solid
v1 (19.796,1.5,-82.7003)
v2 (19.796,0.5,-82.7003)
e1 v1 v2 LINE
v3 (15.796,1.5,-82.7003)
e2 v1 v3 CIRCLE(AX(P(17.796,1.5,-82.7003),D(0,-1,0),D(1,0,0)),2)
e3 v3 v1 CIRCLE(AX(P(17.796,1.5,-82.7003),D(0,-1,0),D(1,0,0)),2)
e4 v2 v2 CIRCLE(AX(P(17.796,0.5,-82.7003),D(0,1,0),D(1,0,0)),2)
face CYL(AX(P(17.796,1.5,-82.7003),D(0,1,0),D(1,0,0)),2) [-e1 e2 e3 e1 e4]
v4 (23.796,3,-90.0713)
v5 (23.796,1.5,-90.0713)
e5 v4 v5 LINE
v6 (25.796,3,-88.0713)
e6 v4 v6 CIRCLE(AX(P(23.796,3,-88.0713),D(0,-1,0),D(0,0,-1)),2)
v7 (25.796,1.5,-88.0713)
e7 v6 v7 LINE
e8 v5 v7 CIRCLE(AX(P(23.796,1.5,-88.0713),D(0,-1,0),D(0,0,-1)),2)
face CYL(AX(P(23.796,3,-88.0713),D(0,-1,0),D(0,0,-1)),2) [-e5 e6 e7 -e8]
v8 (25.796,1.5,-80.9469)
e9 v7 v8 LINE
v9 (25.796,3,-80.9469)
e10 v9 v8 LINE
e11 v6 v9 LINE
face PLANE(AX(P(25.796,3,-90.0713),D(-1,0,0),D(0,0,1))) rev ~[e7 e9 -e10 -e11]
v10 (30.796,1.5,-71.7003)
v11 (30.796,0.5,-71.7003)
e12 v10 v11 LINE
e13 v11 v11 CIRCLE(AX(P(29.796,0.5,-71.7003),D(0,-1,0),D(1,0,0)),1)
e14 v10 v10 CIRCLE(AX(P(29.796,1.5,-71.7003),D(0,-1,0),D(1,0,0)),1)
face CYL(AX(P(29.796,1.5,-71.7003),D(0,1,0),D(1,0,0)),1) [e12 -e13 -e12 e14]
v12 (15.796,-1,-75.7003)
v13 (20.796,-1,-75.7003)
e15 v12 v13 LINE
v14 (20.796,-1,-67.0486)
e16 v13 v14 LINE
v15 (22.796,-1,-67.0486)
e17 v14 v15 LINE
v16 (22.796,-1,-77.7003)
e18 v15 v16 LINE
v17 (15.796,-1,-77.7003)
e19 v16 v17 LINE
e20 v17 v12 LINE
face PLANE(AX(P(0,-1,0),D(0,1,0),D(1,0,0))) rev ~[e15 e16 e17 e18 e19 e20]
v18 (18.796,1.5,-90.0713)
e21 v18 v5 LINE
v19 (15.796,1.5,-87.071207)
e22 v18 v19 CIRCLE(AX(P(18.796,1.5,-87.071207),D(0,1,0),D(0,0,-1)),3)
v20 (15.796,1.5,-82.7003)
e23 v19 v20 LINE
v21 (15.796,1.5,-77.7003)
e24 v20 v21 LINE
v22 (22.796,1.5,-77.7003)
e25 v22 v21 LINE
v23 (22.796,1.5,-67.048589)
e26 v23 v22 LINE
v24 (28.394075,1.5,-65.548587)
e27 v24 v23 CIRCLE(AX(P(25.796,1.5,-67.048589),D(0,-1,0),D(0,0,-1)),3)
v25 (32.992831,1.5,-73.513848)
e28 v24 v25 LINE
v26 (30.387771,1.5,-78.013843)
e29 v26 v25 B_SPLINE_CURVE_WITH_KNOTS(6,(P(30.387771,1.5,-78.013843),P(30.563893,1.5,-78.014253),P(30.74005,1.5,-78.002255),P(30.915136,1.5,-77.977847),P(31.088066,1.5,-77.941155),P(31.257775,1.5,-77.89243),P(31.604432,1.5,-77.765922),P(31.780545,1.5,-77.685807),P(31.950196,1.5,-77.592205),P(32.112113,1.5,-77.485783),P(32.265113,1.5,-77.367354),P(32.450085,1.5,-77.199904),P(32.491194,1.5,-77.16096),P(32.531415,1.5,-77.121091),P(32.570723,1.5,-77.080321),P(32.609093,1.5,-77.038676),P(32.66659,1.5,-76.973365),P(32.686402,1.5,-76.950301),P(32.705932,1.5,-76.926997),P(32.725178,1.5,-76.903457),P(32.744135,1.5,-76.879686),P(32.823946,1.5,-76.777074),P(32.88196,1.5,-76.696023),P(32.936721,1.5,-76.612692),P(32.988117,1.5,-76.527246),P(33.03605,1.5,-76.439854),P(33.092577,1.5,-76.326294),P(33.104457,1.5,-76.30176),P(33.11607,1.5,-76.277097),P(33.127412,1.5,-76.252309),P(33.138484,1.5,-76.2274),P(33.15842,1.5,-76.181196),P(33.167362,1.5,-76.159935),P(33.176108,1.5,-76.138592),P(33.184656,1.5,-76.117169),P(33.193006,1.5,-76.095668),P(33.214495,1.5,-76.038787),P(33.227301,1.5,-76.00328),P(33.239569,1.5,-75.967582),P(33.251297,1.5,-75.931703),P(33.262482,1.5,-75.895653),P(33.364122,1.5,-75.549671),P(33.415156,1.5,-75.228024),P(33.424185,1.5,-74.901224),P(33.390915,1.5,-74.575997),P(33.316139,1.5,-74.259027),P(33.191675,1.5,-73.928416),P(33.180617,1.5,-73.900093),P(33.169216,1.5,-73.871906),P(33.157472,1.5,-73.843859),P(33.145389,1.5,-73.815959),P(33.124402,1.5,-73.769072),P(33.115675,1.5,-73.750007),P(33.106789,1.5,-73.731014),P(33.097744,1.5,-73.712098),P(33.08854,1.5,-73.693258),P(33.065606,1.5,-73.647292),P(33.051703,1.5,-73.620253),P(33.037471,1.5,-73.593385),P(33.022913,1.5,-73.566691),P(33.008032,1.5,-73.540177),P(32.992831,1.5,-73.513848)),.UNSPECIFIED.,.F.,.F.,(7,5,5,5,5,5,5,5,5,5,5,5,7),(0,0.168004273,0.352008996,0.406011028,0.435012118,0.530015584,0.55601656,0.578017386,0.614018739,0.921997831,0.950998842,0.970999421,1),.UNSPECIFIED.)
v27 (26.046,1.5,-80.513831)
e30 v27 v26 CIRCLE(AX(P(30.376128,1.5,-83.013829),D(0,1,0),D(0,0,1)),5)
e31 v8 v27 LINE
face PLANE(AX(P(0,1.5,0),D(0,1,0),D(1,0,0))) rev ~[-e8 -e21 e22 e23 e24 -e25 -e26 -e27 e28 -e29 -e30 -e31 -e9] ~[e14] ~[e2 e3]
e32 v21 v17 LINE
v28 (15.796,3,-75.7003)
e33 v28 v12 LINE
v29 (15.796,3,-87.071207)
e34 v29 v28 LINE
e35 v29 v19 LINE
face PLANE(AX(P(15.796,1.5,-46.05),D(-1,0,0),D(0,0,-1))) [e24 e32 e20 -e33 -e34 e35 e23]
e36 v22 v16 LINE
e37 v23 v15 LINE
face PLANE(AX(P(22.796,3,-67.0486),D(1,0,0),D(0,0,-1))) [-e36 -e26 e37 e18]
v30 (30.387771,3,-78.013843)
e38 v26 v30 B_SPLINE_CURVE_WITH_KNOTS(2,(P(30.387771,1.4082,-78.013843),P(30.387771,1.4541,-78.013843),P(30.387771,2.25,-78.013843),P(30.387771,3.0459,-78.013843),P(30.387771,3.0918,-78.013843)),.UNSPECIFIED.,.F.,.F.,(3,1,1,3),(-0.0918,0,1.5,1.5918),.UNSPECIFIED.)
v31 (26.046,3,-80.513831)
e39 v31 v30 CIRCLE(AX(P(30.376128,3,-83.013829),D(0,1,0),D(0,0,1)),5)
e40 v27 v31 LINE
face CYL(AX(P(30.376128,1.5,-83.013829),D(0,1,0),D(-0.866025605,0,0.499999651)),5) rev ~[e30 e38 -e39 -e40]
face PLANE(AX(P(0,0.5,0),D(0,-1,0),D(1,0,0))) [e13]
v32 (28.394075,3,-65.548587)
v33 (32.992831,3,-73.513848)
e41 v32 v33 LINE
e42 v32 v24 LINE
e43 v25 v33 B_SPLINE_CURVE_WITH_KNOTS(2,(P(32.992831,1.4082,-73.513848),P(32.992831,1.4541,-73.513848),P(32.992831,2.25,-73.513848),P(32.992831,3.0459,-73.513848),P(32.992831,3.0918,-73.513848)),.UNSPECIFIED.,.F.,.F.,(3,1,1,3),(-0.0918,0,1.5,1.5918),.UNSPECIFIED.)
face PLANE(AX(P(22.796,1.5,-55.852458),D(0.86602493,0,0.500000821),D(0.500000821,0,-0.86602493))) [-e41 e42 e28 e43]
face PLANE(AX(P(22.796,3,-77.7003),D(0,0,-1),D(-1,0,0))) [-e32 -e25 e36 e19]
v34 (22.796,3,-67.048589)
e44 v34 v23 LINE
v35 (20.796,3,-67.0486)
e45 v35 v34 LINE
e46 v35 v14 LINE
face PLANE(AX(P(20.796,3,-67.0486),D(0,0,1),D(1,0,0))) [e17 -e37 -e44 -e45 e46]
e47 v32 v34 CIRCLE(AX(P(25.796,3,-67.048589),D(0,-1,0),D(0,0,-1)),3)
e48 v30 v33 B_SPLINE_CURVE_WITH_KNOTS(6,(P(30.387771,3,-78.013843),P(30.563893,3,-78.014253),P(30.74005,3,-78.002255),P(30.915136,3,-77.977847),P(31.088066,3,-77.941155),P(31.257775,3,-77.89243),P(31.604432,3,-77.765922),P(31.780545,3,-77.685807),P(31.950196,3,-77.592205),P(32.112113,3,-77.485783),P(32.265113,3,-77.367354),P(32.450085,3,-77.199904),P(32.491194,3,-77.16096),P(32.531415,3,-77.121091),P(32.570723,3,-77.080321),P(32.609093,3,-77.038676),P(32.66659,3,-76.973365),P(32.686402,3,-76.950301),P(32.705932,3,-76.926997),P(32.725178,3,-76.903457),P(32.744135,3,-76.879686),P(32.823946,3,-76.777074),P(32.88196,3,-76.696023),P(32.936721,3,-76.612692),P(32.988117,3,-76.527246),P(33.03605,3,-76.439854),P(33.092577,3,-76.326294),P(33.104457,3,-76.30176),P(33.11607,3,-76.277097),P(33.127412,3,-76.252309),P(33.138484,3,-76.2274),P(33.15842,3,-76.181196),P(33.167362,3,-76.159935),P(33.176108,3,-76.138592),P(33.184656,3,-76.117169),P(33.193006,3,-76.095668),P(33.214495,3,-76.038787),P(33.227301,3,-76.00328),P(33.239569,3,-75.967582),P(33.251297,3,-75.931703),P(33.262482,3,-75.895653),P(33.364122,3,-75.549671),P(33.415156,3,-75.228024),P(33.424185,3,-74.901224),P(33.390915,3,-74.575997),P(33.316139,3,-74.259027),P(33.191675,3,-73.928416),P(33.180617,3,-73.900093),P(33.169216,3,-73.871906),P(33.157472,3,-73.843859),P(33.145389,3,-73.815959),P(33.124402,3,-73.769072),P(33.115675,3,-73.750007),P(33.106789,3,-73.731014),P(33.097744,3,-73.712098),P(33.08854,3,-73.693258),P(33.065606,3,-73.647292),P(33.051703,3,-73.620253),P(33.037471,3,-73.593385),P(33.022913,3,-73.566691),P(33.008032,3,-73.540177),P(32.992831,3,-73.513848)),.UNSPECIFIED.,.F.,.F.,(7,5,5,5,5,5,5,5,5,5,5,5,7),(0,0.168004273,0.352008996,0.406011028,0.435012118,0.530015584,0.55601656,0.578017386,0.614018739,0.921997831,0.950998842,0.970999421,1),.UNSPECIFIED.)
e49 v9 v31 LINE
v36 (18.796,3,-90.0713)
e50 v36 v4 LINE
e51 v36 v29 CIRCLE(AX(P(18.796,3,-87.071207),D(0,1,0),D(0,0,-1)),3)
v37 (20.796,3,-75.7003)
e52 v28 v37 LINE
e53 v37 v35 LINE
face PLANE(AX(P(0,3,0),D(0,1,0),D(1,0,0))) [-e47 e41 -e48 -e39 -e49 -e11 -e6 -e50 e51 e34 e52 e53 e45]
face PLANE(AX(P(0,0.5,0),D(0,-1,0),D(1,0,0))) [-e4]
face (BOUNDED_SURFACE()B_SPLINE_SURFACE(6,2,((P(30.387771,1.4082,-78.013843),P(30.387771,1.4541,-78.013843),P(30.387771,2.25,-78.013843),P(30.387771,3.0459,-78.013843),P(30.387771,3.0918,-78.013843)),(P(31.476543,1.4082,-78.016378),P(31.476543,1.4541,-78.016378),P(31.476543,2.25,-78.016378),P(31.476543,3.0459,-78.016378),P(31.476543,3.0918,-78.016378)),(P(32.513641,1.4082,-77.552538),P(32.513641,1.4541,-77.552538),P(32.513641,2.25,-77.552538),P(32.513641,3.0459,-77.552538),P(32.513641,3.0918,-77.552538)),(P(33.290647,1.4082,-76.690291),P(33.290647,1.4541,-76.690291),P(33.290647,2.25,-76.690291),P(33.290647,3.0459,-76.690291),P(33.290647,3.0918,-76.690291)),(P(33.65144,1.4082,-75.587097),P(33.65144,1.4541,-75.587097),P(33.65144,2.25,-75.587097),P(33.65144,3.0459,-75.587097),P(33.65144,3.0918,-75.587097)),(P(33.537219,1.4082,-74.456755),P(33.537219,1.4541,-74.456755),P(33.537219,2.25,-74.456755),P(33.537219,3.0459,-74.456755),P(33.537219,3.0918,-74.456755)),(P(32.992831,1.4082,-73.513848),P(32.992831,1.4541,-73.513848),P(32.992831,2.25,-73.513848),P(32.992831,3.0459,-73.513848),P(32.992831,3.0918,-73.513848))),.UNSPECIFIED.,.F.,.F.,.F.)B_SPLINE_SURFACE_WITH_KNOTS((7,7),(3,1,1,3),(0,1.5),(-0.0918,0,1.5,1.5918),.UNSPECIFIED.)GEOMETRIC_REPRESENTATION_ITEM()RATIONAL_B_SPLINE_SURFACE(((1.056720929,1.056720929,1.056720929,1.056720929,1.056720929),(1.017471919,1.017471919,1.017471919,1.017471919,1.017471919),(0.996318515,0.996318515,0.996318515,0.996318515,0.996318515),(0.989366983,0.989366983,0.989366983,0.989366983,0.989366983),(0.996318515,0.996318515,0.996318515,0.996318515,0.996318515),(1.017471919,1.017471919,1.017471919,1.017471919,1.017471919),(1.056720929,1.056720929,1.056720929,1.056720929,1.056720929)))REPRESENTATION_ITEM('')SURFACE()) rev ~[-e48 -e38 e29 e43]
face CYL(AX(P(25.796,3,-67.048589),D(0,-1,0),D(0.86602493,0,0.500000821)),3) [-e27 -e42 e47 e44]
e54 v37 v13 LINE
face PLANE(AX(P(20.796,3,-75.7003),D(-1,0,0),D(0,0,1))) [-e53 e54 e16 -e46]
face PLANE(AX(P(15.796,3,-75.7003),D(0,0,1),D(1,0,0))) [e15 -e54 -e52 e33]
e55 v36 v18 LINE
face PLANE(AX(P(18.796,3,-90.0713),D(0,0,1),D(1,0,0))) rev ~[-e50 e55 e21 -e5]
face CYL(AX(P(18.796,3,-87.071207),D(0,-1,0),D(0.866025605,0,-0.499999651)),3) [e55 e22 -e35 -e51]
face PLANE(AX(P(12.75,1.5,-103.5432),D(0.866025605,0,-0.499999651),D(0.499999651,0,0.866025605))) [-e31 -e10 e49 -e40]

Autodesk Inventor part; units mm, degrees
ref_plane "YZ Plane" through (0, 0, 0) normal (1, 0, 0) x (0, 1, 0)
ref_plane "XZ Plane" through (0, 0, 0) normal (0, 1, 0) x (-1, 0, 0)
ref_plane "XY Plane" through (0, 0, 0) normal (0, 0, 1) x (1, 0, 0)
sketch "スケッチ1" plane through (0, 0, 0) normal (0, 1, 0) x (-1, 0, 0)
  line L0 (75, 0) -> (105, -51.9615)
  line L1 (-75, 0) -> (-105, -51.9615)
  line L2 (0, -218.2384) -> (0, 36.3731)
  line L3 (147, 0) -> (-147, 0)
  line L4 (37.5, -27) -> (-37.5, -27)
  line L5 (105, -51.9615) -> (30, -181.8653)
  line L6 (30, -181.8653) -> (-30, -181.8653)
  line L7 (-30, -181.8653) -> (-105, -51.9615)
  line L8 (75, 0) -> (-75, 0)
  line L9 (-25.3673, -135.8894) -> (-62.8673, -70.9375)
  line L10 (25.3673, -135.8894) -> (62.8673, -70.9375)
  line L11 (-37.5, -27) -> (-27.5, -27)
  line L12 (-27.5, -27) -> (-27.5, -39)
  line L13 (-27.5, -39) -> (-37.5, -39)
  line L14 (-37.5, -39) -> (-37.5, -27)
  line L15 (37.5, -27) -> (27.5, -27)
  line L16 (27.5, -27) -> (27.5, -39)
  line L17 (27.5, -39) -> (37.5, -39)
  line L18 (37.5, -39) -> (37.5, -27)
  line L19 (0, -77.9423) -> (44.1173, -103.4134) construction
  line L20 (0, -77.9423) -> (-44.1173, -103.4134) construction
  line L21 (-44.1173, -103.4134) -> (-67.5, -116.9134) construction
  line L22 (-57.8673, -79.5977) -> (-47.475, -73.5977)
  line L23 (-52.475, -64.9375) -> (-62.8673, -70.9375)
  line L24 (-62.8673, -70.9375) -> (-57.8673, -79.5977)
  line L25 (-47.475, -73.5977) -> (-52.475, -64.9375)
  line L26 (-25.3673, -135.8894) -> (-30.3673, -127.2291)
  line L27 (-19.975, -121.2291) -> (-14.975, -129.8894)
  line L28 (-14.975, -129.8894) -> (-25.3673, -135.8894)
  line L29 (-30.3673, -127.2291) -> (-19.975, -121.2291)
  line L30 (30.3673, -127.2291) -> (19.975, -121.2291)
  line L31 (14.975, -129.8894) -> (25.3673, -135.8894)
  line L32 (25.3673, -135.8894) -> (30.3673, -127.2291)
  line L33 (19.975, -121.2291) -> (14.975, -129.8894)
  line L34 (62.8673, -70.9375) -> (57.8673, -79.5977)
  line L35 (47.475, -73.5977) -> (52.475, -64.9375)
  line L36 (52.475, -64.9375) -> (62.8673, -70.9375)
  line L37 (57.8673, -79.5977) -> (47.475, -73.5977)
  line L38 (62.8673, -70.9375) -> (37.5, -27)
  line L39 (-37.5, -27) -> (-62.8673, -70.9375)
  line L40 (-25.3673, -135.8894) -> (25.3673, -135.8894)
  line L41 (-25.3673, -135.8894) -> (-25.3673, -181.8653)
  line L42 (25.3673, -135.8894) -> (25.3673, -181.8653)
  line L43 (-25.3673, -135.8894) -> (-48.75, -149.3894)
  line L44 (25.3673, -135.8894) -> (48.75, -149.3894)
  point P0 (0, 0)
  point P1 (0, 0)
  point P2 (0, -27)
  dimension "d1" = 150
  dimension "d2" = 60
  dimension "d3" = 60
  dimension "d4" = 27
  dimension "d5" = 75
  dimension "d6" = 60
  dimension "d7" = 27
  dimension "d8" = 10
  dimension "d9" = 12
  dimension "d10" = 10
  dimension "d11" = 12
  dimension "d14" = 360
extrude "プレート1" add sketch "スケッチ1" along normal blind 1.5 contours L5 L6 L42 L44 | L4 L16 L17 L18 L38 L36 L35 L37 L10 L30 L33 L31 L40 L2 | L2 L40 L28 L27 L29 L9 L22 L25 L23 L39 L14 L13 L12 L4 | L31 L33 L30 L10 | L42 L6 L2 L40 | L2 L6 L41 L40 | L4 L18 L17 L16 | L12 L13 L14 L4 | L9 L29 L27 L28 | L41 L6 L7 L43 | L37 L35 L36 L10 | L23 L25 L22 L9
sketch "スケッチ2" plane through (0, 0, 0) normal (0, -1, 0) x (1, 0, 0)
  line L0 (23.3798, -38.55) -> (-23.3798, -38.55) projected
  line L1 (8.2, -46.6) -> (-8.2, -46.6) projected
  arc A0 (-21.1, -27) -> (-23.3798, -38.55) centre (-21.1, -33) ccw projected
  line L2 (-27.5, -27) -> (-27.5, -39) projected
  line L3 (27.5, -39) -> (27.5, -27) projected
  line L4 (-27.5, -39) -> (-27.5, -40.55)
  line L5 (-27.5, -40.55) -> (-10.2, -40.55)
  line L6 (-10.2, -40.55) -> (-10.2, -48.6)
  line L7 (-10.2, -48.6) -> (10.2, -48.6)
  line L8 (10.2, -48.6) -> (10.2, -40.55)
  line L9 (10.2, -40.55) -> (27.5, -40.55)
  line L10 (27.5, -40.55) -> (27.5, -39)
  line L11 (-37.5, -27) -> (-27.5, -27) projected
  line L12 (-37.5, -27) -> (37.5, -27) projected
  line L13 (-20.3112, -101.4469) -> (-30.5112, -83.78)
  line L14 (-27.2827, -105.4719) -> (-20.3112, -101.4469)
  line L15 (-18.6327, -120.4541) -> (-27.2827, -105.4719)
  line L16 (-19.975, -121.2291) -> (-18.6327, -120.4541)
  line L17 (-37.4827, -87.805) -> (-46.1327, -72.8227)
  line L18 (-46.1327, -72.8227) -> (-47.475, -73.5977)
  line L19 (-30.5112, -83.78) -> (-37.4827, -87.805)
  line L20 (30.5112, -83.78) -> (20.3112, -101.4469)
  line L21 (37.4827, -87.805) -> (30.5112, -83.78)
  line L22 (46.1327, -72.8227) -> (37.4827, -87.805)
  line L23 (47.475, -73.5977) -> (46.1327, -72.8227)
  line L24 (27.2827, -105.4719) -> (18.6327, -120.4541)
  line L25 (18.6327, -120.4541) -> (19.975, -121.2291)
  line L26 (20.3112, -101.4469) -> (27.2827, -105.4719)
  line L27 (-47.475, -73.5977) -> (-57.8673, -79.5977)
  line L28 (-57.8673, -79.5977) -> (-30.3673, -127.2291)
  line L29 (-30.3673, -127.2291) -> (-19.975, -121.2291)
  line L30 (19.975, -121.2291) -> (30.3673, -127.2291)
  line L31 (30.3673, -127.2291) -> (57.8673, -79.5977)
  line L32 (57.8673, -79.5977) -> (47.475, -73.5977)
  point P0 (0, 0)
  point P1 (0, -77.9423)
  point P2 (-23.0432, -100.7148)
  point P3 (-33.5673, -121.6866)
  point P4 (-22.4248, -117.8859)
  point P5 (-25.3673, -135.8894)
  point P6 (-28.3712, -118.6866)
  point P7 (-31.2432, -86.512)
  point P8 (-45.8046, -77.3909)
  point P9 (-62.8673, -70.9375)
  point P10 (31.2432, -86.512)
  point P11 (54.6673, -85.1403)
  point P12 (45.8046, -77.3909)
  point P13 (62.8673, -70.9375)
  point P14 (49.4712, -82.1403)
  point P15 (23.0432, -100.7148)
  point P16 (22.4248, -117.8859)
  point P17 (25.3673, -135.8894)
  dimension "d17" = 2
  dimension "d18" = 2
  dimension "d19" = 2
  dimension "d20" = 2
  dimension "d26" = 360
extrude "切り取り1" cut sketch "スケッチ2" against normal blind 1.5
fillet "フィレット1" radius 1.5 18 edges at (-10.2, 0.75, -48.6) (-10.2, 0.75, -40.55) (-27.5, 0.75, -40.55) (10.2, 0.75, -48.6) (10.2, 0.75, -40.55) (27.5, 0.75, -40.55) (-30.5112, 0.75, -83.78) (-46.1327, 0.75, -72.8227) (-20.3112, 0.75, -101.4469) (-27.2827, 0.75, -105.4719) (-37.4827, 0.75, -87.805) (-18.6327, 0.75, -120.4541) (20.3112, 0.75, -101.4469) (27.2827, 0.75, -105.4719) (18.6327, 0.75, -120.4541) (30.5112, 0.75, -83.78) (37.4827, 0.75, -87.805) (46.1327, 0.75, -72.8227)
sketch "スケッチ3" plane through (0, 0, 0) normal (0, -1, 0) x (1, 0, 0)
  circle A0 centre (40.9875, -45.0405) radius 1.6 projected
  circle A1 centre (48.9875, -58.8969) radius 1.6 projected
  circle A2 centre (8, -129.8894) radius 1.6 projected
  circle A3 centre (-8, -129.8894) radius 1.6 projected
  circle A4 centre (-48.9875, -58.8969) radius 1.6 projected
  circle A5 centre (-40.9875, -45.0405) radius 1.6 projected
  point P0 (0, 0)
extrude "切り取り2" cut sketch "スケッチ3" against normal blind 1.5
sketch "スケッチ4" plane through (0, 0, 0) normal (0, -1, 0) x (1, 0, 0)
  circle A0 centre (10, -176.8653) radius 1.35 projected
  circle A1 centre (21.2333, -145.0496) radius 1.6 projected
  circle A2 centre (10, -143.8894) radius 1.6 projected
  line L0 (52.75, -142.4612) -> (30, -181.8653) projected
  line L1 (52.75, -142.4612) -> (33.6974, -131.4612) projected
  line L2 (33.6974, -131.4612) -> (27.1974, -142.7195) projected
  line L3 (27.1974, -142.7195) -> (20.5635, -138.8894) projected
  line L4 (20.5635, -138.8894) -> (5, -138.8894) projected
  line L5 (5, -138.8894) -> (5, -181.8653) projected
  line L6 (30, -181.8653) -> (5, -181.8653) projected
  circle A3 centre (-10, -176.8653) radius 1.35 projected
  circle A4 centre (-21.2333, -145.0496) radius 1.6 projected
  circle A5 centre (-10, -143.8894) radius 1.6 projected
  line L7 (-12.9295, -171.4323) -> (-35.4295, -132.4612) projected
  line L8 (-30.25, -181.4323) -> (-12.9295, -171.4323) projected
  line L9 (-30, -181.8653) -> (-30.25, -181.4323) projected
  line L10 (-30, -181.8653) -> (-5, -181.8653) projected
  line L11 (-5, -181.8653) -> (-5, -138.8894) projected
  line L12 (-5, -138.8894) -> (-20.5635, -138.8894) projected
  line L13 (-20.5635, -138.8894) -> (-27.1974, -142.7195) projected
  line L14 (-33.6974, -131.4612) -> (-27.1974, -142.7195) projected
  line L15 (-35.4295, -132.4612) -> (-33.6974, -131.4612) projected
  point P0 (0, 0)
extrude "切り取り3" cut sketch "スケッチ4" against normal blind 1.5 contours A0 | A1 | A2 | A3 | A4 | A5
sketch "スケッチ5" plane through (0, 1.5, 0) normal (0, 1, 0) x (1, 0, 0)
  line L0 (-19.975, 121.2291) -> (19.975, 121.2291) projected
  line L1 (47.475, 73.5977) -> (27.5, 39) projected
  line L2 (-47.475, 73.5977) -> (-27.5, 39) projected
  point P0 (0, 0)
sketch "スケッチ6" plane through (0, 1.5, 0) normal (0, 1, 0) x (1, 0, 0)
  line L0 (-26.0855, 44.55) -> (-41.9613, 72.0477)
  line L1 (-41.9613, 72.0477) -> (-36.0186, 82.3409)
  line L2 (-36.0186, 82.3409) -> (-29.0471, 78.3159)
  line L3 (-29.0471, 78.3159) -> (-14.8471, 102.911)
  line L4 (-14.8471, 102.911) -> (-21.8186, 106.936)
  line L5 (-21.8186, 106.936) -> (-15.8758, 117.2291)
  line L6 (-15.8758, 117.2291) -> (15.8758, 117.2291)
  line L7 (15.8758, 117.2291) -> (21.8186, 106.936)
  line L8 (21.8186, 106.936) -> (14.8471, 102.911)
  line L9 (14.8471, 102.911) -> (29.0471, 78.3159)
  line L10 (29.0471, 78.3159) -> (36.0186, 82.3409)
  line L11 (36.0186, 82.3409) -> (41.9613, 72.0477)
  line L12 (41.9613, 72.0477) -> (26.0855, 44.55)
  line L13 (26.0855, 44.55) -> (14.2, 44.55)
  line L14 (14.2, 44.55) -> (14.2, 52.6)
  line L15 (14.2, 52.6) -> (-14.2, 52.6)
  line L16 (-14.2, 52.6) -> (-14.2, 44.55)
  line L17 (-14.2, 44.55) -> (-26.0855, 44.55)
  line L18 (-47.475, 73.5977) -> (-27.5, 39) projected
  line L19 (-38.2327, 86.5059) -> (-45.3827, 74.1218) projected
  line L20 (-31.8102, 84.53) -> (-36.1836, 87.055) projected
  line L21 (-21.0612, 100.1479) -> (-29.7612, 85.079) projected
  line L22 (-25.9836, 104.7219) -> (-21.6102, 102.1969) projected
  line L23 (-19.3827, 119.1551) -> (-26.5327, 106.7709) projected
  line L24 (-19.975, 121.2291) -> (19.975, 121.2291) projected
  line L25 (47.475, 73.5977) -> (27.5, 39) projected
  line L26 (26.5327, 106.7709) -> (19.3827, 119.1551) projected
  line L27 (21.6102, 102.1969) -> (25.9836, 104.7219) projected
  line L28 (29.7612, 85.079) -> (21.0612, 100.1479) projected
  line L29 (36.1836, 87.055) -> (31.8102, 84.53) projected
  line L30 (45.3827, 74.1218) -> (38.2327, 86.5059) projected
  line L31 (11.7, 40.55) -> (26, 40.55) projected
  line L32 (10.2, 47.1) -> (10.2, 42.05) projected
  line L33 (-8.7, 48.6) -> (8.7, 48.6) projected
  line L34 (-10.2, 42.05) -> (-10.2, 47.1) projected
  line L35 (-26, 40.55) -> (-11.7, 40.55) projected
  line L36 (0, 48.6) -> (0, 121.2291)
  line L37 (-25.4112, 92.6134) -> (-31.0836, 95.8884) construction
  point P0 (0, 0)
  dimension "d32" = 4
  dimension "d33" = 4
  dimension "d34" = 4
  dimension "d35" = 4
  dimension "d36" = 4
  dimension "d37" = 4
  dimension "d38" = 4
  dimension "d39" = 4
  dimension "d40" = 4
extrude "切り取り4" cut sketch "スケッチ6" against normal blind 1.5
fillet "フィレット2" radius 5 9 edges at (-14.2, 0.75, -44.55) (-26.0855, 0.75, -44.55) (-41.9613, 0.75, -72.0477) (-36.0186, 0.75, -82.3409) (-21.8186, 0.75, -106.936) (-15.8758, 0.75, -117.2291) (-14.2, 0.75, -52.6) (-29.0471, 0.75, -78.3159) (-14.8471, 0.75, -102.911)
mirror "ミラー1" about plane through (0, 0, 0) normal (1, 0, 0) of "フィレット2"
sketch "スケッチ7" plane through (0, 1.5, 0) normal (0, 1, 0) x (1, 0, 0)
  arc A0 (18.2848, 105.0066) -> (17.2511, 98.7471) centre (21.5812, 101.2471) ccw projected
  line L0 (17.2511, 98.7471) -> (26.643, 82.4797) projected
  arc A1 (26.643, 82.4797) -> (32.5808, 80.2452) centre (30.9732, 84.9797) ccw projected
  arc A2 (38.5186, 78.0107) -> (32.5808, 80.2452) centre (34.1884, 75.5107) ccw projected
  line L1 (38.5186, 78.0107) -> (40.5179, 74.5477) projected
  arc A3 (40.5179, 69.5477) -> (40.5179, 74.5477) centre (36.1878, 72.0477) ccw projected
  line L2 (40.5179, 69.5477) -> (27.5289, 47.05) projected
  arc A4 (23.1987, 44.55) -> (27.5289, 47.05) centre (23.1987, 49.55) ccw projected
  line L3 (23.1987, 44.55) -> (19.2, 44.55) projected
  arc A5 (14.296, 48.575) -> (19.2, 44.55) centre (19.2, 49.55) ccw projected
  arc A6 (14.296, 48.575) -> (9.392, 52.6) centre (9.392, 47.6) ccw projected
  line L4 (9.392, 52.6) -> (-9.392, 52.6) projected
  arc A7 (-9.392, 52.6) -> (-14.296, 48.575) centre (-9.392, 47.6) ccw projected
  arc A8 (-19.2, 44.55) -> (-14.296, 48.575) centre (-19.2, 49.55) ccw projected
  line L5 (-19.2, 44.55) -> (-23.1987, 44.55) projected
  arc A9 (-27.5289, 47.05) -> (-23.1987, 44.55) centre (-23.1987, 49.55) ccw projected
  line L6 (-27.5289, 47.05) -> (-40.5179, 69.5477) projected
  arc A10 (-40.5179, 74.5477) -> (-40.5179, 69.5477) centre (-36.1878, 72.0477) ccw projected
  line L7 (-40.5179, 74.5477) -> (-38.5186, 78.0107) projected
  arc A11 (-32.5808, 80.2452) -> (-38.5186, 78.0107) centre (-34.1884, 75.5107) ccw projected
  arc A12 (-32.5808, 80.2452) -> (-26.643, 82.4797) centre (-30.9732, 84.9797) ccw projected
  line L8 (-26.643, 82.4797) -> (-17.2511, 98.7471) projected
  arc A13 (-17.2511, 98.7471) -> (-18.2848, 105.0066) centre (-21.5812, 101.2471) ccw projected
  arc A14 (-19.3186, 111.2661) -> (-18.2848, 105.0066) centre (-14.9884, 108.7661) ccw projected
  line L9 (-19.3186, 111.2661) -> (-17.3192, 114.7291) projected
  arc A15 (-12.9891, 117.2291) -> (-17.3192, 114.7291) centre (-12.9891, 112.2291) ccw projected
  line L10 (-12.9891, 117.2291) -> (12.9891, 117.2291) projected
  arc A16 (17.3192, 114.7291) -> (12.9891, 117.2291) centre (12.9891, 112.2291) ccw projected
  line L11 (17.3192, 114.7291) -> (19.3186, 111.2661) projected
  arc A17 (18.2848, 105.0066) -> (19.3186, 111.2661) centre (14.9884, 108.7661) ccw projected
  circle A18 centre (21.2333, 145.0496) radius 1.6 projected
  circle A19 centre (-10, 143.8894) radius 1.6 projected
  circle A20 centre (-10, 176.8653) radius 1.35 projected
  circle A21 centre (-21.2333, 145.0496) radius 1.6 projected
  circle A22 centre (10, 176.8653) radius 1.35 projected
  circle A23 centre (10, 143.8894) radius 1.6 projected
  circle A24 centre (-48.9875, 58.8969) radius 1.6 projected
  circle A25 centre (8, 129.8894) radius 1.6 projected
  circle A26 centre (40.9875, 45.0405) radius 1.6 projected
  circle A27 centre (48.9875, 58.8969) radius 1.6 projected
  circle A28 centre (-8, 129.8894) radius 1.6 projected
  circle A29 centre (-40.9875, 45.0405) radius 1.6 projected
  arc A30 (38.2327, 86.5059) -> (36.1836, 87.055) centre (36.9336, 85.7559) ccw projected
  line L12 (36.1836, 87.055) -> (31.8102, 84.53) projected
  arc A31 (29.7612, 85.079) -> (31.8102, 84.53) centre (31.0602, 85.829) ccw projected
  line L13 (29.7612, 85.079) -> (21.0612, 100.1479) projected
  arc A32 (21.6102, 102.1969) -> (21.0612, 100.1479) centre (22.3602, 100.8979) ccw projected
  line L14 (21.6102, 102.1969) -> (25.9836, 104.7219) projected
  arc A33 (25.9836, 104.7219) -> (26.5327, 106.7709) centre (25.2336, 106.0209) ccw projected
  line L15 (26.5327, 106.7709) -> (19.3827, 119.1551) projected
  arc A34 (19.9317, 121.2041) -> (19.3827, 119.1551) centre (20.6817, 119.9051) ccw projected
  line L16 (19.9317, 121.2041) -> (30.3673, 127.2291) projected
  line L17 (25.3673, 135.8894) -> (30.3673, 127.2291) projected
  line L18 (48.75, 149.3894) -> (25.3673, 135.8894) projected
  line L19 (30, 181.8653) -> (48.75, 149.3894) projected
  line L20 (-30, 181.8653) -> (30, 181.8653) projected
  line L21 (-48.75, 149.3894) -> (-30, 181.8653) projected
  line L22 (-25.3673, 135.8894) -> (-48.75, 149.3894) projected
  line L23 (-30.3673, 127.2291) -> (-25.3673, 135.8894) projected
  line L24 (-30.3673, 127.2291) -> (-19.9317, 121.2041) projected
  arc A35 (-19.3827, 119.1551) -> (-19.9317, 121.2041) centre (-20.6817, 119.9051) ccw projected
  line L25 (-19.3827, 119.1551) -> (-26.5327, 106.7709) projected
  arc A36 (-26.5327, 106.7709) -> (-25.9836, 104.7219) centre (-25.2336, 106.0209) ccw projected
  line L26 (-25.9836, 104.7219) -> (-21.6102, 102.1969) projected
  arc A37 (-21.0612, 100.1479) -> (-21.6102, 102.1969) centre (-22.3602, 100.8979) ccw projected
  line L27 (-21.0612, 100.1479) -> (-29.7612, 85.079) projected
  arc A38 (-31.8102, 84.53) -> (-29.7612, 85.079) centre (-31.0602, 85.829) ccw projected
  line L28 (-31.8102, 84.53) -> (-36.1836, 87.055) projected
  arc A39 (-36.1836, 87.055) -> (-38.2327, 86.5059) centre (-36.9336, 85.7559) ccw projected
  line L29 (-38.2327, 86.5059) -> (-45.3827, 74.1218) projected
  arc A40 (-47.4317, 73.5727) -> (-45.3827, 74.1218) centre (-46.6817, 74.8718) ccw projected
  line L30 (-47.4317, 73.5727) -> (-57.8673, 79.5977) projected
  line L31 (-62.8673, 70.9375) -> (-57.8673, 79.5977) projected
  line L32 (-37.5, 27) -> (-62.8673, 70.9375) projected
  line L33 (-27.5, 27) -> (-37.5, 27) projected
  line L34 (-27.5, 27) -> (-27.5, 39.05) projected
  arc A41 (-26, 40.55) -> (-27.5, 39.05) centre (-26, 39.05) ccw projected
  line L35 (-26, 40.55) -> (-11.7, 40.55) projected
  arc A42 (-11.7, 40.55) -> (-10.2, 42.05) centre (-11.7, 42.05) ccw projected
  line L36 (-10.2, 42.05) -> (-10.2, 47.1) projected
  arc A43 (-8.7, 48.6) -> (-10.2, 47.1) centre (-8.7, 47.1) ccw projected
  line L37 (-8.7, 48.6) -> (8.7, 48.6) projected
  arc A44 (10.2, 47.1) -> (8.7, 48.6) centre (8.7, 47.1) ccw projected
  line L38 (10.2, 47.1) -> (10.2, 42.05) projected
  arc A45 (10.2, 42.05) -> (11.7, 40.55) centre (11.7, 42.05) ccw projected
  line L39 (11.7, 40.55) -> (26, 40.55) projected
  arc A46 (27.5, 39.05) -> (26, 40.55) centre (26, 39.05) ccw projected
  line L40 (27.5, 39.05) -> (27.5, 27) projected
  line L41 (37.5, 27) -> (27.5, 27) projected
  line L42 (62.8673, 70.9375) -> (37.5, 27) projected
  line L43 (57.8673, 79.5977) -> (62.8673, 70.9375) projected
  line L44 (57.8673, 79.5977) -> (47.4317, 73.5727) projected
  arc A47 (45.3827, 74.1218) -> (47.4317, 73.5727) centre (46.6817, 74.8718) ccw projected
  line L45 (45.3827, 74.1218) -> (38.2327, 86.5059) projected
  line L46 (25.2195, 46.05) -> (15.796, 46.05)
  line L47 (15.796, 46.05) -> (15.796, 54.1)
  line L48 (15.796, 54.1) -> (-15.796, 54.1)
  line L49 (-15.796, 54.1) -> (-15.796, 46.05)
  line L50 (-15.796, 46.05) -> (-25.2195, 46.05)
  line L51 (-25.2195, 46.05) -> (-40.2293, 72.0477)
  line L52 (-40.2293, 72.0477) -> (-35.5175, 80.2087)
  line L53 (-35.5175, 80.2087) -> (-28.546, 76.1837)
  line L54 (-28.546, 76.1837) -> (-12.75, 103.5432)
  line L55 (-12.75, 103.5432) -> (-19.7215, 107.5682)
  line L56 (-19.7215, 107.5682) -> (-15.0098, 115.7291)
  line L57 (-15.0098, 115.7291) -> (15.0098, 115.7291)
  line L58 (15.0098, 115.7291) -> (19.7215, 107.5682)
  line L59 (19.7215, 107.5682) -> (12.75, 103.5432)
  line L60 (12.75, 103.5432) -> (28.546, 76.1837)
  line L61 (28.546, 76.1837) -> (35.5175, 80.2087)
  line L62 (35.5175, 80.2087) -> (40.2293, 72.0477)
  line L63 (40.2293, 72.0477) -> (25.2195, 46.05)
  line L64 (0, 54.1) -> (0, 115.7291) construction
  line L65 (0, 218.2384) -> (0, -36.3731) construction
  line L66 (40.5179, 69.5477) -> (27.5289, 47.05) projected
  line L67 (20.648, 89.8634) -> (0, 77.9423) construction
  line L68 (0, 54.1) -> (0, 77.9423) construction
  line L69 (17.3192, 114.7291) -> (19.3186, 111.2661) projected
  point P0 (0, 0)
  dimension "d44" = 1.5
  dimension "d45" = 1.5
  dimension "d46" = 1.5
  dimension "d47" = 1.5
  dimension "d48" = 1.5
  dimension "d49" = 1.5
  dimension "d50" = 1.5
  dimension "d51" = 1.5
extrude "押し出し1" cut sketch "スケッチ7" against normal through all contours A0 L0 A1 A2 L1 A3 L2 A4 L3 A5 A6 L4 A7 A8 L5 A9 L6 A10 L7 A11 A12 L8 A13 A14 L9 A15 L10 A16 L11 A17 | L45 A47 L44 L43 L42 L41 L40 A46 L39 A45 L38 A44 L37 A43 L36 A42 L35 A41 L34 L33 L32 L31 L30 A40 L29 A39 L28 A38 L27 A37 L26 A36 L25 A35 L24 L23 L22 L21 L20 L19 L18 L17 L16 A34 L15 A33 L14 A32 L13 A31 L12 A30 | L46 L47 L48 L49 L50 L51 L52 L53 L54 L55 L56 L57 L58 L59 L60 L61 L62 L63
extrude "押し出し2" add sketch "スケッチ7" along normal blind 1.5 contours L46 L47 L48 L49 L50 L51 L52 L53 L54 L55 L56 L57 L58 L59 L60 L61 L62 L63
sketch "スケッチ8" plane through (0, 3, 0) normal (0, 1, 0) x (1, 0, 0)
  line L0 (15, 59.1) -> (-15, 59.1)
  line L1 (-15, 59.1) -> (-15, 124.1)
  line L2 (-15, 124.1) -> (15, 124.1)
  line L3 (15, 124.1) -> (15, 59.1)
  line L4 (-15.796, 54.1) -> (15.796, 54.1) projected
  line L5 (15.0098, 115.7291) -> (-15.0098, 115.7291) projected
  line L6 (15, 59.1) -> (15, 54.1)
  line L7 (-15.796, 46.05) -> (-15.796, 54.1) projected
  line L8 (-25.2195, 46.05) -> (-15.796, 46.05) projected
  line L9 (-40.2293, 72.0477) -> (-25.2195, 46.05) projected
  line L10 (-35.5175, 80.2087) -> (-40.2293, 72.0477) projected
  line L11 (-28.546, 76.1837) -> (-35.5175, 80.2087) projected
  line L12 (-12.75, 103.5432) -> (-28.546, 76.1837) projected
  line L13 (-19.7215, 107.5682) -> (-12.75, 103.5432) projected
  line L14 (-15.0098, 115.7291) -> (-19.7215, 107.5682) projected
  line L15 (15.796, 54.1) -> (15.796, 114.3674)
  line L16 (19.7215, 107.5682) -> (15.0098, 115.7291) projected
  line L17 (12.75, 103.5432) -> (19.7215, 107.5682) projected
  point P0 (0, 0)
  point P1 (0, 59.1)
  point P2 (0, 54.1)
  point P3 (-15, 115.7291)
  point P4 (15, 115.7291)
  point P5 (-15, 104.8422)
  point P6 (-15, 99.6461)
  point P7 (15.796, 105.3017)
  dimension "d56" = 65
  dimension "d57" = 30
  dimension "d58" = 5
extrude "押し出し3" cut sketch "スケッチ8" against normal through all
fillet "フィレット4" radius 5 5 edges at (28.546, 2.25, -76.1837) (35.5175, 2.25, -80.2087) (40.2293, 2.25, -72.0477) (25.2195, 2.25, -46.05) (15.796, 2.25, -46.05)
fillet "フィレット5" radius 3 1 edges at (15.796, 2.25, -98.2674)
sketch "スケッチ9" plane through (0, 1.5, 0) normal (0, -1, 0) x (1, 0, 0)
  line L0 (11.5, -82.5) -> (11.5, -82.525) projected
  line L1 (11.5, -82.5) -> (14.13, -82.5) projected
  arc A0 (14.13, -82.5) -> (14.18, -82.45) centre (14.13, -82.45) ccw projected
  line L2 (14.18, -82.95) -> (14.18, -82.45) projected
  arc A1 (14.18, -82.95) -> (14.13, -82.9) centre (14.13, -82.95) ccw projected
  line L3 (11.5, -82.9) -> (14.13, -82.9) projected
  line L4 (11.5, -82.875) -> (11.5, -82.9) projected
  line L5 (11.11, -82.875) -> (11.5, -82.875) projected
  arc A2 (11.0667, -82.85) -> (11.11, -82.875) centre (11.11, -82.825) ccw projected
  arc A3 (11.0667, -82.85) -> (11.0234, -82.825) centre (11.0234, -82.875) ccw projected
  line L6 (10.96, -82.825) -> (11.0234, -82.825) projected
  line L7 (10.96, -82.575) -> (10.96, -82.825) projected
  line L8 (11.0234, -82.575) -> (10.96, -82.575) projected
  arc A4 (11.0234, -82.575) -> (11.0667, -82.55) centre (11.0234, -82.525) ccw projected
  arc A5 (11.11, -82.525) -> (11.0667, -82.55) centre (11.11, -82.575) ccw projected
  line L9 (11.5, -82.525) -> (11.11, -82.525) projected
  line L10 (13.14, -82.875) -> (13.14, -82.525) projected
  line L11 (13.14, -82.875) -> (13.2786, -82.875) projected
  line L12 (13.2786, -82.875) -> (13.2786, -82.525) projected
  line L13 (13.2786, -82.525) -> (13.14, -82.525) projected
  arc A6 (15.796, -87.0713) -> (21.3941, -88.5713) centre (18.796, -87.0713) ccw projected
  point P0 (0, 0)
  point P1 (14.18, -82.7)
  dimension "d64" = 4.3713
sketch "スケッチ10" plane through (0, 3, 0) normal (0, 1, 0) x (1, 0, 0)
  arc A0 (21.3941, 88.5713) -> (15.796, 87.0713) centre (18.796, 87.0713) ccw projected
  line L0 (18.796, 90.0713) -> (25.796, 90.0713)
  line L1 (25.796, 90.0713) -> (25.796, 80.9469)
  line L2 (26.046, 80.5138) -> (21.3941, 88.5713) projected
  line L3 (15.796, 87.0713) -> (15.796, 51.05) projected
  point P0 (0, 0)
  dimension "d65" = 10
extrude "押し出し4" add sketch "スケッチ10" against normal up to surface (1.5 mm away)
fillet "フィレット6" radius 2 1 edges at (25.796, 2.25, -90.0713)
sketch "スケッチ12" plane through (0, 1.5, 0) normal (0, -1, 0) x (1, 0, 0)
  circle A0 centre (17.796, -52.05) radius 2
  circle A1 centre (26.3742, -52.05) radius 2
  circle A2 centre (17.796, -82.7003) radius 2
  line L0 (20.796, -46.05) -> (22.3327, -46.05) projected
  line L1 (15.796, -51.05) -> (15.796, -87.0713) projected
  line L2 (26.6628, -48.55) -> (38.7859, -69.5477) projected
  arc A3 (15.796, -87.0713) -> (21.3941, -88.5713) centre (18.796, -87.0713) ccw projected
  arc A4 (15.796, -87.0713) -> (18.796, -90.0713) centre (18.796, -87.0713) ccw projected
  point P0 (0, 0)
  dimension "d69" = 4
  dimension "d70" = 6
  dimension "d71" = 4.371
extrude "押し出し5" add sketch "スケッチ12" along normal blind 1
sketch "スケッチ13" plane through (0, 1.5, 0) normal (0, -1, 0) x (1, 0, 0)
  line L0 (15.796, -87.7003) -> (25.796, -87.7003)
  line L1 (25.796, -87.7003) -> (25.796, -77.7003)
  line L2 (25.796, -77.7003) -> (15.796, -77.7003)
  line L3 (15.796, -77.7003) -> (15.796, -87.7003)
  circle A0 centre (17.796, -82.7003) radius 2 projected
  line L4 (15.796, -50.05) -> (22.796, -50.05)
  line L5 (22.796, -50.05) -> (22.796, -77.7003)
  line L6 (22.796, -77.7003) -> (15.796, -77.7003)
  line L7 (15.796, -77.7003) -> (15.796, -50.05)
  line L8 (15.796, -52.05) -> (15.796, -82.7003) projected
  circle A1 centre (17.796, -52.05) radius 2 projected
  line L9 (25.796, -88.0713) -> (25.796, -80.9469) projected
  line L10 (22.6062, -41.5237) -> (16.544, -45.0237)
  line L11 (16.544, -45.0237) -> (38.2131, -82.5556)
  line L12 (38.2131, -82.5556) -> (44.2753, -79.0556)
  line L13 (44.2753, -79.0556) -> (22.6062, -41.5237)
  line L14 (28.1062, -51.05) -> (38.7859, -69.5477) projected
  arc A2 (20.796, -46.05) -> (15.796, -51.05) centre (20.796, -51.05) ccw projected
  circle A3 centre (29.796, -71.7003) radius 1
  point P0 (0, 0)
  point P1 (22.796, -55.8524)
  point P2 (17.739, -47.0934)
  point P3 (15.897, -50.05)
  dimension "d74" = 5
  dimension "d75" = 10
  dimension "d76" = 7
  dimension "d77" = 7
  dimension "d84" = 7
  dimension "d85" = 6
  dimension "d86" = 2
extrude "押し出し6" cut sketch "スケッチ13" along normal mid plane 100 contours L7 A1 L4 L11 L5 L2 | A1 | L7 A2 L4 A1 | L11 L4 L5 | L5 L4 L11 L10 L13 L12 | L7 L4 A2 | L4 A2 L11
fillet "フィレット7" radius 3 2 edges at (22.796, 2.25, -55.8524) (35.6432, 2.25, -78.1044)
sketch "スケッチ14" plane through (0, 3, 0) normal (0, 1, 0) x (1, 0, 0)
  line L0 (22.796, 67.0486) -> (22.796, 77.7003) projected
  line L1 (22.796, 77.7003) -> (15.796, 77.7003)
  line L2 (15.796, 77.7003) -> (15.796, 75.7003)
  line L3 (15.796, 75.7003) -> (22.796, 75.7003)
  line L4 (22.796, 75.7003) -> (22.796, 77.7003)
  line L5 (22.796, 75.7003) -> (20.796, 75.7003)
  line L6 (20.796, 75.7003) -> (20.796, 67.0486)
  line L7 (20.796, 67.0486) -> (22.796, 67.0486)
  line L8 (22.796, 67.0486) -> (22.796, 75.7003)
  point P0 (0, 0)
  dimension "d81" = 2
extrude "押し出し7" add sketch "スケッチ14" against normal blind 4
extrude "押し出し8" add sketch "スケッチ13" along normal blind 1 contours A3
equation "\"d3\" = d2"
equation "\"d7\" = d4"
equation "\"d19\" = d18"
equation "\"d21\" = Thickness"
equation "\"d28\" = Thickness"
equation "\"d30\" = Thickness"
equation "\"d33\" = d32"
equation "\"d34\" = d32"
equation "\"d35\" = d32"
equation "\"d36\" = d32"
equation "\"d37\" = d32"
equation "\"d38\" = d32"
equation "\"d39\" = d32"
equation "\"d40\" = d32"
equation "\"d41\" = Thickness"
equation "\"d45\" = d44"
equation "\"d46\" = d44"
equation "\"d47\" = d44"
equation "\"d48\" = d44"
equation "\"d49\" = d44"
equation "\"d50\" = d44"
equation "\"d51\" = d44"
equation "\"d16\" = Thickness"
equation "\"BendRadius\" = Thickness"
equation "\"BendReliefWidth\" = Thickness"
equation "\"BendReliefDepth\" = 0.5 * Thickness"
equation "\"CornerReliefSize\" = 4 * Thickness"
equation "\"MinimumRemnant\" = 2 * Thickness"
equation "\"TransitionRadius\" = BendRadius"
equation "\"JacobiRadiusSize\" = BendRadius"
equation "\"GapSize\" = Thickness"
equation "\"Thickness\" = 1.5"
properties part number "CORE_hat_outline_typeB_ver2"
